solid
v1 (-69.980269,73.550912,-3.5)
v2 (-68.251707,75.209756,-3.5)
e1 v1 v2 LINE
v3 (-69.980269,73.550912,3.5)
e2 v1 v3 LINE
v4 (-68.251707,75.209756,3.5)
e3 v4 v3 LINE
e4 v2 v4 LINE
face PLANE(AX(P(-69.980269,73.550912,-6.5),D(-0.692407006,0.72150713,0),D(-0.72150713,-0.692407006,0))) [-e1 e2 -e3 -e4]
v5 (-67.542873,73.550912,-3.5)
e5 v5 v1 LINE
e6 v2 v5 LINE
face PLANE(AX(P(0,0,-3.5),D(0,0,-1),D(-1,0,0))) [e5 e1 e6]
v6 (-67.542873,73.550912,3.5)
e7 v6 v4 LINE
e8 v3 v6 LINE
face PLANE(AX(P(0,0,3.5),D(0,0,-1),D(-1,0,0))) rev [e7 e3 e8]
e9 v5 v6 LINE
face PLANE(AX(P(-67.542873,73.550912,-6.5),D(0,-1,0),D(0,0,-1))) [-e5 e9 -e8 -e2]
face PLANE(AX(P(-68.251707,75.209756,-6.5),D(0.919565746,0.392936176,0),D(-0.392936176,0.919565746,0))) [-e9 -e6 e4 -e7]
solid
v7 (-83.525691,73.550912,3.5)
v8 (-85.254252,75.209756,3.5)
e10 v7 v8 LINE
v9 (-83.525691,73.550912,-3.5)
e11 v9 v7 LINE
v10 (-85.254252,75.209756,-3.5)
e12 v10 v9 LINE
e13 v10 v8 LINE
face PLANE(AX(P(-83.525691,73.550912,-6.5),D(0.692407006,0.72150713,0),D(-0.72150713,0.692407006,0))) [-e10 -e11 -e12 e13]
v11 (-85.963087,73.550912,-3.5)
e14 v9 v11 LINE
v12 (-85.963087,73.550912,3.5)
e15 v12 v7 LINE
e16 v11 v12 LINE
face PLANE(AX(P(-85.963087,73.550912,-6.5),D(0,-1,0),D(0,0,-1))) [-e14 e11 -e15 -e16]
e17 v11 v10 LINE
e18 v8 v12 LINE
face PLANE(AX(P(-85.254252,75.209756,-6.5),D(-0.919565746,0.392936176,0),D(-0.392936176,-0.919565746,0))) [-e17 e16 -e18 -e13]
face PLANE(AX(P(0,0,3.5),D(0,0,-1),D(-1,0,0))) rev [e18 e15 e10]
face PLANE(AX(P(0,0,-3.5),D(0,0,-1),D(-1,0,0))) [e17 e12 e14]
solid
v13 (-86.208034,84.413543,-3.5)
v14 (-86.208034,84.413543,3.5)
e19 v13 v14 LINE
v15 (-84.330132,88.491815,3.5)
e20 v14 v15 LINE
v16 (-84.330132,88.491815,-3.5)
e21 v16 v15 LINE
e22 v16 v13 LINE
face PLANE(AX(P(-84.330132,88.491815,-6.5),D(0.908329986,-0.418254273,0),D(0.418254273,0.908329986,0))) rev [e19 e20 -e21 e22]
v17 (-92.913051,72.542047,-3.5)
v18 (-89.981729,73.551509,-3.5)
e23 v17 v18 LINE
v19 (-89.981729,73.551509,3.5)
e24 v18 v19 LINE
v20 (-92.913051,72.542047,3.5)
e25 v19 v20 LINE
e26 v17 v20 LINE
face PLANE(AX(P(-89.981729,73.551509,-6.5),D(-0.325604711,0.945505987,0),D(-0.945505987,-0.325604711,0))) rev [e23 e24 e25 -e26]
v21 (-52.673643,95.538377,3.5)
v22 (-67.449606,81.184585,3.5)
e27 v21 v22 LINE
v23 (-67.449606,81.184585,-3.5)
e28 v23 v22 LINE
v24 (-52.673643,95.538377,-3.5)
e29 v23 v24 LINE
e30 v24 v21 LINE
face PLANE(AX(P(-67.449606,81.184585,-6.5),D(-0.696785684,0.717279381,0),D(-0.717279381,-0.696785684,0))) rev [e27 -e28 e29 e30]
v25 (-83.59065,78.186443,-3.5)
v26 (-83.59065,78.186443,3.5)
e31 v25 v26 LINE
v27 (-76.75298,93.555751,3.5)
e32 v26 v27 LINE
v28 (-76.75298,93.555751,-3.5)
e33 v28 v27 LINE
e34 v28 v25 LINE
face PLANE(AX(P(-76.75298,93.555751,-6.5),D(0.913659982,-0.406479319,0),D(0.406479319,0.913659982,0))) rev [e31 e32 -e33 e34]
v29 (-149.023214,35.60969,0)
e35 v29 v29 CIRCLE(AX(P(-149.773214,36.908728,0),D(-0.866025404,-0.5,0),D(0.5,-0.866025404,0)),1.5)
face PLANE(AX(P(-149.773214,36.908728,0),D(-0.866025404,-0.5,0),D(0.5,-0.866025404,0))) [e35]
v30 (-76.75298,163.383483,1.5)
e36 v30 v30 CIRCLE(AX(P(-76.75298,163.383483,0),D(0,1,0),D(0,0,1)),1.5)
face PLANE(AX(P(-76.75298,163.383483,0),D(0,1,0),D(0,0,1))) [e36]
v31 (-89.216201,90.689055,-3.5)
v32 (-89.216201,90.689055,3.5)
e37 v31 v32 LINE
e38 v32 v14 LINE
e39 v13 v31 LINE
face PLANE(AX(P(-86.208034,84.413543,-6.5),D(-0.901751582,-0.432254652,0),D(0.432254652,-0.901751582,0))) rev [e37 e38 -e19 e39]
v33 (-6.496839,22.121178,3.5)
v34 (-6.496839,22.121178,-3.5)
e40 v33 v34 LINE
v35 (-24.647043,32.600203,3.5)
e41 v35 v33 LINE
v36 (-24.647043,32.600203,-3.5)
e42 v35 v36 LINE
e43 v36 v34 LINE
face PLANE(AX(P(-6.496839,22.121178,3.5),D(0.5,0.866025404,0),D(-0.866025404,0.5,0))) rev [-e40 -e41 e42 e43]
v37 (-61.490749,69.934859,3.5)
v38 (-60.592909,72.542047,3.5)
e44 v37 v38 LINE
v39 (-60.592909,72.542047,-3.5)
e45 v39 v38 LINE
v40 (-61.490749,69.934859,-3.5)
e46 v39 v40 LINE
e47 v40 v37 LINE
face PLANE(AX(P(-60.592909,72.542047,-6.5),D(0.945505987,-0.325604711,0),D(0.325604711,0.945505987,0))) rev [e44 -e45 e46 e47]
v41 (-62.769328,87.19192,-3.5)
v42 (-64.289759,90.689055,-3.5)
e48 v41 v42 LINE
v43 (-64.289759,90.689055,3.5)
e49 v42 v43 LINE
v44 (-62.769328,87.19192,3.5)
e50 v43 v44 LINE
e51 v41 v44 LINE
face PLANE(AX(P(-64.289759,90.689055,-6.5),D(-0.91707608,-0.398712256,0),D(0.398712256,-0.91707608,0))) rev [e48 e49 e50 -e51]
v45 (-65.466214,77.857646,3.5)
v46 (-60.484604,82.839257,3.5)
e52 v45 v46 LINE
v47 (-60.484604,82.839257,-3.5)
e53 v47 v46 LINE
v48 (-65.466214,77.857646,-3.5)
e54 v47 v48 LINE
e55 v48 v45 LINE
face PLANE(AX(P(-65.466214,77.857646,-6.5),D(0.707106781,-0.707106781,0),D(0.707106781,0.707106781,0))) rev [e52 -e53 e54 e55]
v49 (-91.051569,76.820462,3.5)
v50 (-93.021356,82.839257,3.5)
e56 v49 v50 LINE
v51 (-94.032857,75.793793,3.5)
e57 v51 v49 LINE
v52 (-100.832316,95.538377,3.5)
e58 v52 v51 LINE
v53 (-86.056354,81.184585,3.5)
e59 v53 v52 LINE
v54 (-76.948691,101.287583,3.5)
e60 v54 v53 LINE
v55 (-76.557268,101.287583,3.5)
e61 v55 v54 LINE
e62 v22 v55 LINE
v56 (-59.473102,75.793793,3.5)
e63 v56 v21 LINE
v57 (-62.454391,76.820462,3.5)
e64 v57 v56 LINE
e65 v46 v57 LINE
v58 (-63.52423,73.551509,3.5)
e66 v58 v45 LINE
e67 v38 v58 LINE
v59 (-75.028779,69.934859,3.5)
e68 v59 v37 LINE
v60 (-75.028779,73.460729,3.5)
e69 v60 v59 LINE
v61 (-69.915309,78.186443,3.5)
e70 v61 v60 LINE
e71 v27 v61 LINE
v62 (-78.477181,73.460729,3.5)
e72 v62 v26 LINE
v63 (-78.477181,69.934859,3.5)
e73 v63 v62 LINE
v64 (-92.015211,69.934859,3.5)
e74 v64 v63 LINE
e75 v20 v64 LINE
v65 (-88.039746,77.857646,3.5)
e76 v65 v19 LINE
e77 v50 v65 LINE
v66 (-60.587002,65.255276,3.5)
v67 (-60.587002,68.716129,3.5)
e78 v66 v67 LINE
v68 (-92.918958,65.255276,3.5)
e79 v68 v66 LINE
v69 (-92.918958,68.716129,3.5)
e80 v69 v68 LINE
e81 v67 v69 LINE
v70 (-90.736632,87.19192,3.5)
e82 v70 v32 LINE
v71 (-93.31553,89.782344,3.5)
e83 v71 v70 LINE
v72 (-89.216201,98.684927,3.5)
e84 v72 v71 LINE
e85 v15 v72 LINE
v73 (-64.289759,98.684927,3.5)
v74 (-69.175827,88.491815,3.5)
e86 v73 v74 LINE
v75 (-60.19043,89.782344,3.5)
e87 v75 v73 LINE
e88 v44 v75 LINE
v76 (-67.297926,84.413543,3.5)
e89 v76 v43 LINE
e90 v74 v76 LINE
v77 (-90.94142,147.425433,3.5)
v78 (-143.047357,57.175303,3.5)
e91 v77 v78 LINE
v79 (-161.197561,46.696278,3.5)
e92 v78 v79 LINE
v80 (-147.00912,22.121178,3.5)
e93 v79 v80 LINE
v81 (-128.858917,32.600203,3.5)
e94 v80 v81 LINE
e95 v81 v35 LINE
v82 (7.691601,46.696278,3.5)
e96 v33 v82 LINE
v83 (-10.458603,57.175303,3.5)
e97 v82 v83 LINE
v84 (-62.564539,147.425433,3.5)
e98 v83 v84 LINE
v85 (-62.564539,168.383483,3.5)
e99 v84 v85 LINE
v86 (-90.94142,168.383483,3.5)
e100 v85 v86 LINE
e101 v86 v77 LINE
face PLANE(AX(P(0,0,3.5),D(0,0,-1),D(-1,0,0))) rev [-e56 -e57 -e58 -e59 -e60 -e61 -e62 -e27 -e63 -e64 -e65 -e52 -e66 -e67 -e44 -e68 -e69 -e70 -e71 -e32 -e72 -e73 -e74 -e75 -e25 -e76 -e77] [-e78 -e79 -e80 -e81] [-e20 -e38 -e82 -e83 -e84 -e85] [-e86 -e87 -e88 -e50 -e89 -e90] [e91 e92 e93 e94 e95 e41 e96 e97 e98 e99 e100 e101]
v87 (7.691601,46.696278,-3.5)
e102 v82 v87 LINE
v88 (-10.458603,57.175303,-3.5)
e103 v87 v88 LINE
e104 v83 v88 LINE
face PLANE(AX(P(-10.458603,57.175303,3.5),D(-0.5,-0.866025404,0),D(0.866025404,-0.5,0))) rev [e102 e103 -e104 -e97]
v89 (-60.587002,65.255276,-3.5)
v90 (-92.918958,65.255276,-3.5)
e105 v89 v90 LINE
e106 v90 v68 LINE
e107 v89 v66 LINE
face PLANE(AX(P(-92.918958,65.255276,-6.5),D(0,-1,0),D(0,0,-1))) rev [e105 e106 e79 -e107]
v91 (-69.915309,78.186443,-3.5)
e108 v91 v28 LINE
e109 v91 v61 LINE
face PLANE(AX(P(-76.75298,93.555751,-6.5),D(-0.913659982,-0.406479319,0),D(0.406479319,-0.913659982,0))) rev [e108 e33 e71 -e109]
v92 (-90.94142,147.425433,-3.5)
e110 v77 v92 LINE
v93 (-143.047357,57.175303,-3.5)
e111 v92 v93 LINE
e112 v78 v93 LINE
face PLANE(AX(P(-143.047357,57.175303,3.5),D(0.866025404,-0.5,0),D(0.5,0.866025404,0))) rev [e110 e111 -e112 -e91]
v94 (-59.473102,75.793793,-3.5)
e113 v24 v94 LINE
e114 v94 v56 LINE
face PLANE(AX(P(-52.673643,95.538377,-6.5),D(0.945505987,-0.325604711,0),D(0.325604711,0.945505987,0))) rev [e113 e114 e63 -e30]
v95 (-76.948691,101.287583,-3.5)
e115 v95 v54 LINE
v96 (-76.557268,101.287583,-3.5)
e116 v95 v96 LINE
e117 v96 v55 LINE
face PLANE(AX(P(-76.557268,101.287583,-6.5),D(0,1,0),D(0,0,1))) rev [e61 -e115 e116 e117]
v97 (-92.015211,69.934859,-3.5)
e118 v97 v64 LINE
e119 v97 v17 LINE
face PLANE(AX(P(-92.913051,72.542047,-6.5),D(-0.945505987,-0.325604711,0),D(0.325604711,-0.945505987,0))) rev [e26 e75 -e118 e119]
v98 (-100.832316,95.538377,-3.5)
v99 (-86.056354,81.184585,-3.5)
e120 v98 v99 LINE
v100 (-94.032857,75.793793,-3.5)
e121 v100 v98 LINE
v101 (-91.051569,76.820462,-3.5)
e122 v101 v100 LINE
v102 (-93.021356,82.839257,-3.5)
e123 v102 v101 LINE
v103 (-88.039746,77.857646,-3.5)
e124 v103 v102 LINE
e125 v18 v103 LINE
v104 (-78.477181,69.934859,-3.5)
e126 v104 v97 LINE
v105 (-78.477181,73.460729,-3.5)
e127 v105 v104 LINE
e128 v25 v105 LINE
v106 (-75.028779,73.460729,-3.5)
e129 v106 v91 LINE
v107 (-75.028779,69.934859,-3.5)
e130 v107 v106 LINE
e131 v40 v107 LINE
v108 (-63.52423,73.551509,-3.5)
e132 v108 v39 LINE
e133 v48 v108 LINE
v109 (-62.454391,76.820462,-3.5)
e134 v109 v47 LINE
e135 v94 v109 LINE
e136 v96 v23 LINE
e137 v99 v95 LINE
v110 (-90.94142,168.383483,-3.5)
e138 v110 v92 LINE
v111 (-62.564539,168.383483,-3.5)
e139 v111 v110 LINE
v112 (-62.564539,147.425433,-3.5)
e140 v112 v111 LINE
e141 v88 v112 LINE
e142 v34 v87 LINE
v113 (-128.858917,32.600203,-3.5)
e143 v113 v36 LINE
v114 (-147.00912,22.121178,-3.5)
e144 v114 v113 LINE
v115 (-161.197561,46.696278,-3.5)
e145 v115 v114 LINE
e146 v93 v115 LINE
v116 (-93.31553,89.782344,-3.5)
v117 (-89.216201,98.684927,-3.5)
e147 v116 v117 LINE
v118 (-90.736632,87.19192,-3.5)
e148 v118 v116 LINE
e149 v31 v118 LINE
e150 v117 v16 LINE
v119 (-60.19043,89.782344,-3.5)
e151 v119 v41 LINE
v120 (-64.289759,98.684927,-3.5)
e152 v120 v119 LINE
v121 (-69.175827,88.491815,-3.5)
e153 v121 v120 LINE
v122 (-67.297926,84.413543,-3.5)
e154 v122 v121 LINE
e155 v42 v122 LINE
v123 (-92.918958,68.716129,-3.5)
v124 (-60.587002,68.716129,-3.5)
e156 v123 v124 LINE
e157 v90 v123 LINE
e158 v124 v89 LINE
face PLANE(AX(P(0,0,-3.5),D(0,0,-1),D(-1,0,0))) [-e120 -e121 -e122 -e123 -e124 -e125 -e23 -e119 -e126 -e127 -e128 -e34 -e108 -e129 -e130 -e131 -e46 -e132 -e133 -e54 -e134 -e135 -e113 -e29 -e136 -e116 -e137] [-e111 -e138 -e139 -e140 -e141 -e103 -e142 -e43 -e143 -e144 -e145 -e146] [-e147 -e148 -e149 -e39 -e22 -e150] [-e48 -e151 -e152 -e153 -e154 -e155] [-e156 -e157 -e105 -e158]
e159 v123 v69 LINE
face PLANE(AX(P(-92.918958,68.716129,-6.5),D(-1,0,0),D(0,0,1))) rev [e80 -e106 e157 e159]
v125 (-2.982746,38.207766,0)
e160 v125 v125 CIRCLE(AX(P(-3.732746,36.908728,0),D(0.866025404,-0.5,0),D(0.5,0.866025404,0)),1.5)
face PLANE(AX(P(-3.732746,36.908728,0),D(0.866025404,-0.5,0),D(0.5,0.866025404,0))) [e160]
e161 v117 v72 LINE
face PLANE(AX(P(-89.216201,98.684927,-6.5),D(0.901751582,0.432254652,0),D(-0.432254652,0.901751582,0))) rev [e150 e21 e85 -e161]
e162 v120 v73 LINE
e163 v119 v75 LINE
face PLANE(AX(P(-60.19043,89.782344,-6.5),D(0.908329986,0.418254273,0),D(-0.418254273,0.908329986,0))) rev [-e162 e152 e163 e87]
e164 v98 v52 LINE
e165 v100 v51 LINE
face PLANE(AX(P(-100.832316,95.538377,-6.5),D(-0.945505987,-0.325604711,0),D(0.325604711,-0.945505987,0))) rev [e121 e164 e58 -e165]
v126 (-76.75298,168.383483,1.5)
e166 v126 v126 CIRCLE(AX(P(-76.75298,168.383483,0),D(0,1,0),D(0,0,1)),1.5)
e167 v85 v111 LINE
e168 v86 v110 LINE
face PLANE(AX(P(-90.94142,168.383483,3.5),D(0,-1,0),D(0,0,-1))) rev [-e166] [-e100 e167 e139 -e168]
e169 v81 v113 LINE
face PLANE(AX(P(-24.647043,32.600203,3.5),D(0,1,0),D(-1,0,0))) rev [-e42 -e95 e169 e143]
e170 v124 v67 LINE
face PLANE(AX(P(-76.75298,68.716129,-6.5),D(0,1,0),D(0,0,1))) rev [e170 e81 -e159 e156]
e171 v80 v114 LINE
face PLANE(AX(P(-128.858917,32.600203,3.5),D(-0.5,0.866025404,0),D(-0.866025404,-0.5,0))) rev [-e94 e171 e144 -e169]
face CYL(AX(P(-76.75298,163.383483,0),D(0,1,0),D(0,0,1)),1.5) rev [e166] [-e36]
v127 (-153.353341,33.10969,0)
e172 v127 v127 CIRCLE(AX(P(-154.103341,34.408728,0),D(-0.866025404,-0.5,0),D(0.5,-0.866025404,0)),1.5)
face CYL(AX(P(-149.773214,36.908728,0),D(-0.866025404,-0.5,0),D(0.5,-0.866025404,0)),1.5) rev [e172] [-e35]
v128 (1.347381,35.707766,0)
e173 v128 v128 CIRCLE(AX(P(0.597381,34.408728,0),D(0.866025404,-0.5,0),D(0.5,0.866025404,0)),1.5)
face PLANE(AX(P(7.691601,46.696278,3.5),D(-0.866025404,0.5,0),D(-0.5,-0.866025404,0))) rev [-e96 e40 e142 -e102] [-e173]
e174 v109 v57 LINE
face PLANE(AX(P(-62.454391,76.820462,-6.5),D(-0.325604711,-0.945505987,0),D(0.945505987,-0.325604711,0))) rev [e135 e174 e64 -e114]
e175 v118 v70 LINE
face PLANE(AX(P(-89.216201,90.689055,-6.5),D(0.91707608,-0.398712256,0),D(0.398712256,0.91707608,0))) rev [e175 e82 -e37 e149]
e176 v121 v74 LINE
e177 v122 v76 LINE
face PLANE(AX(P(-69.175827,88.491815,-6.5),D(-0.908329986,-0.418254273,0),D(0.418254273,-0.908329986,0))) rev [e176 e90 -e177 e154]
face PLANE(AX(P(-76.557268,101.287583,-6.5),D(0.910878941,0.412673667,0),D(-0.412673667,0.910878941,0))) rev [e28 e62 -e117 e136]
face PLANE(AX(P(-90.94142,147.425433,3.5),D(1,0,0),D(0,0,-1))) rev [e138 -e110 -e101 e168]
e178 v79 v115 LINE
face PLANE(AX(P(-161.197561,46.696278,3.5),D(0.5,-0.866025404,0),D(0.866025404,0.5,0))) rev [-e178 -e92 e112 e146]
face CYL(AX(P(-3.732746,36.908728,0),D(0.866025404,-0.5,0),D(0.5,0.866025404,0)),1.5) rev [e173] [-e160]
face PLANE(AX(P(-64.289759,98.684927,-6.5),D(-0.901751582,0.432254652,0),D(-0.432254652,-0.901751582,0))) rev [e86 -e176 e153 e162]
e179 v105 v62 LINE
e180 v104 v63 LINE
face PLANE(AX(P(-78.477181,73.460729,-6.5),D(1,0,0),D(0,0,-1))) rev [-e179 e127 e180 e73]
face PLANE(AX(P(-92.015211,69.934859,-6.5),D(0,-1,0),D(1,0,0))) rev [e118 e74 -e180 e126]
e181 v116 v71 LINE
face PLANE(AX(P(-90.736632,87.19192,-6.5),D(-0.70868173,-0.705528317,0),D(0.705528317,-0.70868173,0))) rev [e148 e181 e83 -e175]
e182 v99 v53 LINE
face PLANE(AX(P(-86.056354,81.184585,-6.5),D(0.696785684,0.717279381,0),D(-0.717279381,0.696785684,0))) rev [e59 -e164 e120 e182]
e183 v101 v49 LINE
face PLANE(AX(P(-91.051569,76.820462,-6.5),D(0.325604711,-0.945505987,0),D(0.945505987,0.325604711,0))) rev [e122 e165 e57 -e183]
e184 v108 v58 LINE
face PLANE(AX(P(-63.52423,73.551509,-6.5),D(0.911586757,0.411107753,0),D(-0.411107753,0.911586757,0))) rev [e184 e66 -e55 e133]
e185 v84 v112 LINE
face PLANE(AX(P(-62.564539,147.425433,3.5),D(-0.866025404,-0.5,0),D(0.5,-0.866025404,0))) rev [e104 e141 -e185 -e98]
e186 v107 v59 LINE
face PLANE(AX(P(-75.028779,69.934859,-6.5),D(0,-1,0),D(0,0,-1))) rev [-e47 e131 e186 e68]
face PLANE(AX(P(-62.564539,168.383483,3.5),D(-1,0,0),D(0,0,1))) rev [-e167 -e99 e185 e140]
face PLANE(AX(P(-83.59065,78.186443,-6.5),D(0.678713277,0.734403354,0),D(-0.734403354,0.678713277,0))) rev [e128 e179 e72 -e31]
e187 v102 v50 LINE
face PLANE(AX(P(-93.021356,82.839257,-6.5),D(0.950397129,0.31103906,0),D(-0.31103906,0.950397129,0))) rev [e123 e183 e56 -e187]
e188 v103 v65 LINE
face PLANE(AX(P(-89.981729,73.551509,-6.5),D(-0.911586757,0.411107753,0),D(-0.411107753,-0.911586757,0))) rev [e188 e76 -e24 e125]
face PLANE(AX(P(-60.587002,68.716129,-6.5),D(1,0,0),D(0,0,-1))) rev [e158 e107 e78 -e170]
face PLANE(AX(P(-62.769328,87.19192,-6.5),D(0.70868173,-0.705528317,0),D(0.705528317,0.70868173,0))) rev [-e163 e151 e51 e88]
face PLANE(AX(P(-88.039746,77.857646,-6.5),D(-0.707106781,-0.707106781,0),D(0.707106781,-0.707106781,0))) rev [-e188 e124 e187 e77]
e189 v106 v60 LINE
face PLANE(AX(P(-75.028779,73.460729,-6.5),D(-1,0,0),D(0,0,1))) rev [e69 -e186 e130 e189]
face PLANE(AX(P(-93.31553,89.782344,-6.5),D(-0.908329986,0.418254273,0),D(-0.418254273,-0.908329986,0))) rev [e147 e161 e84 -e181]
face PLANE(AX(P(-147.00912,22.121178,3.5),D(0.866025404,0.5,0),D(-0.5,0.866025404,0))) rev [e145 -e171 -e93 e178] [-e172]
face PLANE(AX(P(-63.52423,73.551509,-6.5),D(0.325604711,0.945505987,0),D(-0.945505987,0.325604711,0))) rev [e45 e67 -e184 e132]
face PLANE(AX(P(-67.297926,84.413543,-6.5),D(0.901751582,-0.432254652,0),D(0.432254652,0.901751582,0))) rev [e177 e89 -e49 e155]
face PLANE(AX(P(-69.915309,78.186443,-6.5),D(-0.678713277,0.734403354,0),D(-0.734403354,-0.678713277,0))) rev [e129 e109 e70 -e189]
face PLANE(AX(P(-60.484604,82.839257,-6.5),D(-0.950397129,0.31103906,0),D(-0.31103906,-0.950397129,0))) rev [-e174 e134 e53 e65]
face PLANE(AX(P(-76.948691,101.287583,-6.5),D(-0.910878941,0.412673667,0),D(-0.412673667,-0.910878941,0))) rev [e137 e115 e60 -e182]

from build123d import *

# Parameters (mm, degrees)
BOSS_EXTRUDE1_DEPTH    = 3.5
SKETCH7_R              = 1.5
CUT_EXTRUDE2_DEPTH     = 5
SKETCH8_R              = 1.5
CUT_EXTRUDE3_DEPTH     = 5
CIRPATTERN2_COUNT      = 3
SKETCH10_R             = 1.5
CUT_EXTRUDE4_DEPTH     = 5
CUT_EXTRUDE6_START     = -3.5
CUT_EXTRUDE6_OUTLINE_W = 32.331955976
CUT_EXTRUDE6_OUTLINE_H = 3.460853055
CUT_EXTRUDE6_DEPTH     = 7


# Read off the part's stored shape, not the designer's step: Cut-Extrude6
with BuildPart() as part:
    # Sketch5 → Boss-Extrude1 (new, symmetric)
    with BuildSketch(Plane.XY):
        Polygon((-90.941420321, 147.425432766), (-90.941420321, 168.383482689), (-62.564539335, 168.383482689), (-62.564539335, 147.425432766), (-10.458602513, 57.175302815), (7.691601133, 46.696277854), (-6.49683936, 22.12117804), (-24.647043006, 32.600203001), (-128.85891665, 32.600203001), (-147.009120296, 22.12117804), (-161.197560789, 46.696277854), (-143.047357143, 57.175302815), align=None)
    extrude(amount=BOSS_EXTRUDE1_DEPTH, both=True)

    # Sketch7 → Cut-Extrude2 (cut)
    with BuildSketch(Plane(origin=(-14.451380592, 8.343508475, 0), x_dir=(0, 0, -1), z_dir=(0.8660254037844364, -0.5000000000000041, 0))):
        with Locations(Location((0, 30.097522957, 0), (0, 0, 90))):
            Circle(SKETCH7_R)
    extrude(amount=-CUT_EXTRUDE2_DEPTH, mode=Mode.SUBTRACT)

    # Sketch8 → Cut-Extrude3 (cut)
    with BuildSketch(Plane(origin=(-100.67808915, -58.126521872, 0), x_dir=(0, 0, 1), z_dir=(-0.8660254037844431, -0.49999999999999245, 0))):
        with Locations(Location((0, 106.850502785, 0), (0, 0, 270))):
            Circle(SKETCH8_R)
    cut_extrude3 = extrude(amount=-CUT_EXTRUDE3_DEPTH, mode=Mode.SUBTRACT)

    # CirPattern2: Cut-Extrude3 ×3 about axis
    cirpattern2_axis = Axis((-73.590173973, 82.29390331, -173.325842425), (0, 0, 1))
    for i in range(1, CIRPATTERN2_COUNT):
        add(cut_extrude3.rotate(cirpattern2_axis, i * 360 / CIRPATTERN2_COUNT), mode=Mode.SUBTRACT)

    # Sketch10 → Cut-Extrude4 (cut)
    with BuildSketch(Plane(origin=(0, 168.383482689, 0), x_dir=(1, 0, 0), z_dir=(0, 1, 0))):
        with Locations(Location((-76.752979828, 0, 0), (0, 0, 270))):
            Circle(SKETCH10_R)
    extrude(amount=-CUT_EXTRUDE4_DEPTH, mode=Mode.SUBTRACT)

    # Cut-Extrude6 outline → Cut-Extrude6 (cut)
    # profile 1 of 4: a face of its own
    with BuildSketch(Plane.XY.offset(CUT_EXTRUDE6_START)):
        Polygon((-76.948691213, 101.287582971), (-86.056353801, 81.184584586), (-100.832316407, 95.538376831), (-94.032857208, 75.793793389), (-91.051568615, 76.820462308), (-93.021355851, 82.839256642), (-88.039745602, 77.857646392), (-89.981729258, 73.551508719), (-92.913050535, 72.542047087), (-92.015211095, 69.934859484), (-78.477180663, 69.934859484), (-78.477180663, 73.460729214), (-83.5906503, 78.186442564), (-76.752979828, 93.555750632), (-69.915309356, 78.186442564), (-75.028778993, 73.460729214), (-75.028778993, 69.934859484), (-61.490748561, 69.934859484), (-60.592909121, 72.542047087), (-63.524230398, 73.551508719), (-65.466214054, 77.857646392), (-60.484603805, 82.839256642), (-62.454391041, 76.820462308), (-59.473102448, 75.793793389), (-52.673643249, 95.538376831), (-67.449605855, 81.184584586), (-76.557268443, 101.287582971), align=None)
        Polygon((-83.525690609, 73.550911585), (-85.963086807, 73.550911585), (-85.254252198, 75.209756113), align=None, mode=Mode.SUBTRACT)
        Polygon((-68.251707458, 75.209756113), (-67.542872849, 73.550911585), (-69.980269047, 73.550911585), align=None, mode=Mode.SUBTRACT)
    # profile 2 of 4: a face of its own
    with BuildSketch(Plane.XY.offset(CUT_EXTRUDE6_START)):
        Polygon((-69.175827244, 88.491814683), (-67.297925544, 84.413543316), (-64.289758699, 90.689055224), (-62.769327814, 87.191919697), (-60.190430004, 89.782344087), (-64.289758699, 98.684926605), align=None)
    # profile 3 of 4: a face of its own
    with BuildSketch(Plane.XY.offset(CUT_EXTRUDE6_START)):
        with Locations((-76.752979828, 66.985702835)):
            Rectangle(CUT_EXTRUDE6_OUTLINE_W, CUT_EXTRUDE6_OUTLINE_H)
    # profile 4 of 4: a face of its own
    with BuildSketch(Plane.XY.offset(CUT_EXTRUDE6_START)):
        Polygon((-93.315529652, 89.782344087), (-90.736631842, 87.191919697), (-89.216200957, 90.689055224), (-86.208034112, 84.413543316), (-84.330132412, 88.491814683), (-89.216200957, 98.684926605), align=None)
    extrude(amount=CUT_EXTRUDE6_DEPTH, mode=Mode.SUBTRACT)


solid = part.part
